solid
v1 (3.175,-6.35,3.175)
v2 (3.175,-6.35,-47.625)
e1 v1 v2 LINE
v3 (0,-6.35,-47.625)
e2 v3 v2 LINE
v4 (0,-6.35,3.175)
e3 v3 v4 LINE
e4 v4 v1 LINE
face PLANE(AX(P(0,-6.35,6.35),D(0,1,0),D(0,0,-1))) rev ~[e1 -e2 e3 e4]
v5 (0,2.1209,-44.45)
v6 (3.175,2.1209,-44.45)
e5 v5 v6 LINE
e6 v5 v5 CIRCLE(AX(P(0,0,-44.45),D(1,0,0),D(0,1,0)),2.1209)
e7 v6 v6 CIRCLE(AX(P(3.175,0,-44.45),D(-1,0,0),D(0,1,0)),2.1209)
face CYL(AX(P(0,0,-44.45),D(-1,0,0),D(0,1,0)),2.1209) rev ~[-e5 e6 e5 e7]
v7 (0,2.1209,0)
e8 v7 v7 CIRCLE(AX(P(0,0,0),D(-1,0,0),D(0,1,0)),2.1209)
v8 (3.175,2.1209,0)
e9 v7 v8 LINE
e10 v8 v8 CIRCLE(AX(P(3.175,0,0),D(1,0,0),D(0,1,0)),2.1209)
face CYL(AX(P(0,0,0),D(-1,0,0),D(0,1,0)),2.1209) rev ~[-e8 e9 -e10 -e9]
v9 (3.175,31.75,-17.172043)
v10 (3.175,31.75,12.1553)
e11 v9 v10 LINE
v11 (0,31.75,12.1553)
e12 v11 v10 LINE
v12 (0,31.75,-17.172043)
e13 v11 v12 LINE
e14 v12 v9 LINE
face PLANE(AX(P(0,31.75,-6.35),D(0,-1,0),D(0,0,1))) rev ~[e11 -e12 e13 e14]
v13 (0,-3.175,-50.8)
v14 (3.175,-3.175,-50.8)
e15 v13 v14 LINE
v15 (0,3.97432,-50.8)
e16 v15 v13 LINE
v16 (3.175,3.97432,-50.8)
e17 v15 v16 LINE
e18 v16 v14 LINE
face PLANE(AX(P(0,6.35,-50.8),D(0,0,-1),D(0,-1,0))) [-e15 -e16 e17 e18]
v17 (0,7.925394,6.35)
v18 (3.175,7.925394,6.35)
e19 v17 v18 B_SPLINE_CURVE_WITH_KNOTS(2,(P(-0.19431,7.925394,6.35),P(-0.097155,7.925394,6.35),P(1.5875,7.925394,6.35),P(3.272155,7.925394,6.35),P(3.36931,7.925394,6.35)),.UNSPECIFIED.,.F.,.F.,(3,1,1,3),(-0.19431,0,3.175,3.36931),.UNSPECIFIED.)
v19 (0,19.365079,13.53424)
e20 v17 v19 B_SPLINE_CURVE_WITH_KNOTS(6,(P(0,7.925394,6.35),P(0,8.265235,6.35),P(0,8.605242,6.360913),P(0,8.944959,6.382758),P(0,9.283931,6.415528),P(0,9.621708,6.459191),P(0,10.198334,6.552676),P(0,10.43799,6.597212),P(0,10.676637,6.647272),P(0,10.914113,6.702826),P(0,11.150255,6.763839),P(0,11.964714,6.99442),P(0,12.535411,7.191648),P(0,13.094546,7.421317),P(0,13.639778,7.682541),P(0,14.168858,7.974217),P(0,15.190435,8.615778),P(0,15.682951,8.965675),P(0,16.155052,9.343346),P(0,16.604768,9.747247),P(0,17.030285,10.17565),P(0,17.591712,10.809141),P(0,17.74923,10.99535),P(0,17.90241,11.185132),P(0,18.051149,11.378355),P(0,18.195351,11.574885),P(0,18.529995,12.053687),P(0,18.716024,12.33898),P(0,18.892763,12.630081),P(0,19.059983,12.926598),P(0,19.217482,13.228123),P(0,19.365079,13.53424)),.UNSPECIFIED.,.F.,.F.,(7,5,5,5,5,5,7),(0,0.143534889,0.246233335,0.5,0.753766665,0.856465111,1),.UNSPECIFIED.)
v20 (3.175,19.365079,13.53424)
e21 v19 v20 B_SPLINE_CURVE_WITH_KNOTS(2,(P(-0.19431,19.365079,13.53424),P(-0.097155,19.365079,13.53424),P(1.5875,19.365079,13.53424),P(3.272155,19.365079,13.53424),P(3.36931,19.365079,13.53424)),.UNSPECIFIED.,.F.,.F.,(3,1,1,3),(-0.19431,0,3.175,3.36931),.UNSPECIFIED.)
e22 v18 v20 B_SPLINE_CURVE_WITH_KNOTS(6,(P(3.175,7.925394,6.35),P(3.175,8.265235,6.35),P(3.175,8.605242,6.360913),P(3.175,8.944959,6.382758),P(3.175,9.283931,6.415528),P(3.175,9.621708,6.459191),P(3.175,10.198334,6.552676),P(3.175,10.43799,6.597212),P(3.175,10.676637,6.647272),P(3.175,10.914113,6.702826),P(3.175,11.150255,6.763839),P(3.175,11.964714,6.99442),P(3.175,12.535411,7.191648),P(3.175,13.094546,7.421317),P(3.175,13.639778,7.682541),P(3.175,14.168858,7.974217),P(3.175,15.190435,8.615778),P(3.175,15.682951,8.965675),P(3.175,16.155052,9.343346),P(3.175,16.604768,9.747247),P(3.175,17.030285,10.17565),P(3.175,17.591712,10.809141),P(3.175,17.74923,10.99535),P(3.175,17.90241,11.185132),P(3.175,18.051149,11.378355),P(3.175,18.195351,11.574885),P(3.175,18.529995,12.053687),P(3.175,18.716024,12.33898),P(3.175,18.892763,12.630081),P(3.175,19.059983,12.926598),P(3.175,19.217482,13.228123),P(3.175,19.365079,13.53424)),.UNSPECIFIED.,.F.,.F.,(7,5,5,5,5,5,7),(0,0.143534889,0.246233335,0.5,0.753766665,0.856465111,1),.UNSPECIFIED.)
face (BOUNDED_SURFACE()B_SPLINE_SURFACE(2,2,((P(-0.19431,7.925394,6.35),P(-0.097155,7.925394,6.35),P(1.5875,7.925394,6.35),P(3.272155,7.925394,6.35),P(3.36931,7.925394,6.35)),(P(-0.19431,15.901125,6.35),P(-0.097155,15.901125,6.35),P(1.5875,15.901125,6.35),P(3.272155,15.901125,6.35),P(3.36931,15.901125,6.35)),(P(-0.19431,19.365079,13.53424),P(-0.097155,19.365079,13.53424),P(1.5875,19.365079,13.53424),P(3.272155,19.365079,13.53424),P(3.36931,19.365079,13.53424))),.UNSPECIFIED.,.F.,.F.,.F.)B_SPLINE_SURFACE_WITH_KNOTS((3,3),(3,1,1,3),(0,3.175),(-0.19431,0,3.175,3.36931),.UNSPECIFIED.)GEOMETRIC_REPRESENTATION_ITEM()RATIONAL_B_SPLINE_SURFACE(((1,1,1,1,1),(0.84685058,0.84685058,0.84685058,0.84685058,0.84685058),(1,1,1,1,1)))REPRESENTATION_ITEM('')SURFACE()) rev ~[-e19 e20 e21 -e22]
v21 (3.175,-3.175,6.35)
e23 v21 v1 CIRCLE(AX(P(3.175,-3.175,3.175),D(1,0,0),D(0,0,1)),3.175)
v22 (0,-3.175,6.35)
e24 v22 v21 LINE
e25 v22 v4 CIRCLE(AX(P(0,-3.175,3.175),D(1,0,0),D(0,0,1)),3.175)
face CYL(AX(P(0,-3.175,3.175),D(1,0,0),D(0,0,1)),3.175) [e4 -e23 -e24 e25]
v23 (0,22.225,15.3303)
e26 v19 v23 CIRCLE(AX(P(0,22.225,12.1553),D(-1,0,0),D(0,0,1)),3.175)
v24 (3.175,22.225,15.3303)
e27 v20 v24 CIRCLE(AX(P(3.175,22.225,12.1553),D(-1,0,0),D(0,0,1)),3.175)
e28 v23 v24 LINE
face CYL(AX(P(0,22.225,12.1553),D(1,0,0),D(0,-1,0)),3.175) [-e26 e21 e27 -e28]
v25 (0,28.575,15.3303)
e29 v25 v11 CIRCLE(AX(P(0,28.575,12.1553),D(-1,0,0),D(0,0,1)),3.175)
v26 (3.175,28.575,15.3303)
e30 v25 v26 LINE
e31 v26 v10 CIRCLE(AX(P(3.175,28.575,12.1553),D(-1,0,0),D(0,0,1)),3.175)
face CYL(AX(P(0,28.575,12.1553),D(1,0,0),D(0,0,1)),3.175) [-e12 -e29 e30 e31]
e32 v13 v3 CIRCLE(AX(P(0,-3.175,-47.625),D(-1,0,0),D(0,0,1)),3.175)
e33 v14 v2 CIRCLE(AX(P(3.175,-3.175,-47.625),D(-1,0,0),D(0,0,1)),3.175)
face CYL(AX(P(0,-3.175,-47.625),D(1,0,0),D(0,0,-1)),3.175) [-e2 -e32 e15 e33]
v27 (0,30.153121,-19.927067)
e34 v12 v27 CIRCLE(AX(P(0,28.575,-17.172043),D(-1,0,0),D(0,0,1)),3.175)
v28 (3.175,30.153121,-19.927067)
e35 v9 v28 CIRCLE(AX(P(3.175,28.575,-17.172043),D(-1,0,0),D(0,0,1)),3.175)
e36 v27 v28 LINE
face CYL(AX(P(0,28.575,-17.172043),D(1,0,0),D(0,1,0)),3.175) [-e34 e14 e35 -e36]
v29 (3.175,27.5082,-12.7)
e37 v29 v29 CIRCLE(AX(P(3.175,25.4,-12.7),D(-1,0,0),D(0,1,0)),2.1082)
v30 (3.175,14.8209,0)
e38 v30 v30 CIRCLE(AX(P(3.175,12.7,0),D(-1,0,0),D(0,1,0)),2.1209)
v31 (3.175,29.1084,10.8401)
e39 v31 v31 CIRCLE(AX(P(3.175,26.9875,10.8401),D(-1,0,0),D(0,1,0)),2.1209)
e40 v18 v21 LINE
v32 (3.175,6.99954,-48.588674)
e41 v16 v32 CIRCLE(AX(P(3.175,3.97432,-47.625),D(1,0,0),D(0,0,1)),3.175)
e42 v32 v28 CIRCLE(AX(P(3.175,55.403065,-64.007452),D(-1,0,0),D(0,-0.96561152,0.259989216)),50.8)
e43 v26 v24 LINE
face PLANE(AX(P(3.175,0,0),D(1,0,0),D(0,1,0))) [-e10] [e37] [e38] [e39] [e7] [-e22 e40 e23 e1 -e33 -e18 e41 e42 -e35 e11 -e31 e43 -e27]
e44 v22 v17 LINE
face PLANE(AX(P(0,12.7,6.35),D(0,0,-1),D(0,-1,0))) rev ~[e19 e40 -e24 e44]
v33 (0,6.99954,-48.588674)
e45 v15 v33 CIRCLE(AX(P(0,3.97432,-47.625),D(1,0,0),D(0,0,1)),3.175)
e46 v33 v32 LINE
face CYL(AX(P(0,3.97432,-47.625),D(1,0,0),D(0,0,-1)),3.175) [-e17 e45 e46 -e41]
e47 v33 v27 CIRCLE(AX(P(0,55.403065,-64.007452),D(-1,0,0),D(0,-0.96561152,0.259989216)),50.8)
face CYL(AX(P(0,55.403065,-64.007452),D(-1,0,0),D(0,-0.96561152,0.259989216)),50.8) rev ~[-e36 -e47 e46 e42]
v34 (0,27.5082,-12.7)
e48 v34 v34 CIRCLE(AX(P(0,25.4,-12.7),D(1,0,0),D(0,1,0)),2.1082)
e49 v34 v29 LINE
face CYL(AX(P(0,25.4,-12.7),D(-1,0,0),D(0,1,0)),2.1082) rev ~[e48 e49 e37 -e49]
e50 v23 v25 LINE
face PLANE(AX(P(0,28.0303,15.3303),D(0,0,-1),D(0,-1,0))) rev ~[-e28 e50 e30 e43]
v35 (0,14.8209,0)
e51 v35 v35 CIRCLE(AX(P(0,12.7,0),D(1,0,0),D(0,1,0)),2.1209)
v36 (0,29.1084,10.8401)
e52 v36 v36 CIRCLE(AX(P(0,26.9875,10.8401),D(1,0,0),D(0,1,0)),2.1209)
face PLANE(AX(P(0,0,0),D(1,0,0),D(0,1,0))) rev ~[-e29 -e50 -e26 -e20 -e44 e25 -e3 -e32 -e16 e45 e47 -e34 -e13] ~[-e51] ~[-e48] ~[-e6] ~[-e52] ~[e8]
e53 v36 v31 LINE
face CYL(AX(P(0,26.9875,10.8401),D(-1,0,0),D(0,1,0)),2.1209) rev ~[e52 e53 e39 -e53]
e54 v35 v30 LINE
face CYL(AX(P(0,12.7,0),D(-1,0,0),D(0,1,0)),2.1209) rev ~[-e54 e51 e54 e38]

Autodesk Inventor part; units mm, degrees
ref_plane "YZ Plane" through (0, 0, 0) normal (1, 0, 0) x (0, 1, 0)
ref_plane "XZ Plane" through (0, 0, 0) normal (0, 1, 0) x (-1, 0, 0)
ref_plane "XY Plane" through (0, 0, 0) normal (0, 0, 1) x (1, 0, 0)
sketch "Sketch1" plane through (0, 0, 0) normal (1, 0, 0) x (0, 1, 0)
  line L0 (0, 0) -> (12.7, 0)
  circle A0 centre (12.7, 0) radius 2.1209
  circle A1 centre (0, 0) radius 2.1209
  line L1 (12.7, 0) -> (12.7, 6.35)
  line L2 (12.7, 6.35) -> (19.05, 6.35)
  line L3 (19.05, 6.35) -> (-6.35, 6.35)
  line L4 (-6.35, 6.35) -> (-6.35, -6.35)
  line L5 (-6.35, -6.35) -> (19.05, -6.35)
  line L6 (19.05, -6.35) -> (19.05, 6.35)
  line L7 (19.05, -6.35) -> (19.05, -19.05)
  line L8 (19.05, -19.05) -> (31.75, -19.05)
  line L9 (31.75, -19.05) -> (31.75, -6.35)
  line L10 (31.75, -6.35) -> (19.05, 6.35)
  line L11 (19.05, -19.05) -> (6.35, -6.35)
  line L12 (19.05, -12.7) -> (25.4, -12.7)
  circle A2 centre (25.4, -12.7) radius 2.1082
  line L13 (0, 0) -> (0, -44.45)
  circle A3 centre (0, -44.45) radius 2.1209
  line L14 (-6.35, -6.35) -> (31.75, -6.35)
  line L15 (31.75, -6.35) -> (31.75, -50.8)
  line L16 (31.75, -50.8) -> (-6.35, -50.8)
  line L17 (-6.35, -50.8) -> (-6.35, -6.35)
  line L18 (6.35, -6.35) -> (6.35, -50.8)
  line L19 (19.05, -19.05) -> (6.35, -19.05)
  line L20 (31.75, -6.35) -> (31.75, 15.3303)
  line L21 (31.75, 15.3303) -> (28.0303, 15.3303)
  line L22 (31.75, 15.3303) -> (34.925, 15.3303)
  line L23 (31.75, -19.05) -> (34.925, -19.05)
  line L24 (34.925, -19.05) -> (34.925, 15.3303)
  line L25 (28.0303, 15.3303) -> (19.05, 15.3303)
  line L26 (19.05, 15.3303) -> (19.05, 6.35)
  line L27 (34.925, 10.8401) -> (19.05, 10.8401)
  circle A4 centre (26.9875, 10.8401) radius 2.1209
  dimension "d0" = 12.7
  dimension "d1" = 4.2418
  dimension "d2" = 4.2418
  dimension "d3" = 6.35
  dimension "d4" = 6.35
  dimension "d5" = 25.4
  dimension "d6" = 12.7
  dimension "d7" = 12.7
  dimension "d8" = 4.2164
  dimension "d11" = 44.45
  dimension "d15" = 12.7
  dimension "d19" = 3.175
  dimension "d20" = 4.2418
extrude "Extrusion1" add sketch "Sketch1" along normal blind 3.175 contours A1 L13 L5 L4 L3 L1 A0 L0 | L0 A0 L1 L2 L6 L5 L13 A1 | L5 L18 L16 L17 | L5 L7 L11 | L11 L19 L18 | L14 L9 L8 L7 | L6 L10 L14 | L26 L27 A4 L20 L10 | L26 L25 L21 L20 L27 A4
fillet "Fillet1" radius 50.8 1 edges at (1.5875, 6.35, -19.05)
fillet "Fillet3" radius 3.175 6 edges at (1.5875, 31.75, 15.3303) (1.5875, 31.75, -19.05) (1.5875, 6.35, -50.8) (1.5875, -6.35, -50.8) (1.5875, -6.35, 6.35) (1.5875, 19.05, 15.3303)
fillet "Fillet4" radius 12.7 1 edges at (1.5875, 19.05, 6.35)
properties part number "sled mounts"
